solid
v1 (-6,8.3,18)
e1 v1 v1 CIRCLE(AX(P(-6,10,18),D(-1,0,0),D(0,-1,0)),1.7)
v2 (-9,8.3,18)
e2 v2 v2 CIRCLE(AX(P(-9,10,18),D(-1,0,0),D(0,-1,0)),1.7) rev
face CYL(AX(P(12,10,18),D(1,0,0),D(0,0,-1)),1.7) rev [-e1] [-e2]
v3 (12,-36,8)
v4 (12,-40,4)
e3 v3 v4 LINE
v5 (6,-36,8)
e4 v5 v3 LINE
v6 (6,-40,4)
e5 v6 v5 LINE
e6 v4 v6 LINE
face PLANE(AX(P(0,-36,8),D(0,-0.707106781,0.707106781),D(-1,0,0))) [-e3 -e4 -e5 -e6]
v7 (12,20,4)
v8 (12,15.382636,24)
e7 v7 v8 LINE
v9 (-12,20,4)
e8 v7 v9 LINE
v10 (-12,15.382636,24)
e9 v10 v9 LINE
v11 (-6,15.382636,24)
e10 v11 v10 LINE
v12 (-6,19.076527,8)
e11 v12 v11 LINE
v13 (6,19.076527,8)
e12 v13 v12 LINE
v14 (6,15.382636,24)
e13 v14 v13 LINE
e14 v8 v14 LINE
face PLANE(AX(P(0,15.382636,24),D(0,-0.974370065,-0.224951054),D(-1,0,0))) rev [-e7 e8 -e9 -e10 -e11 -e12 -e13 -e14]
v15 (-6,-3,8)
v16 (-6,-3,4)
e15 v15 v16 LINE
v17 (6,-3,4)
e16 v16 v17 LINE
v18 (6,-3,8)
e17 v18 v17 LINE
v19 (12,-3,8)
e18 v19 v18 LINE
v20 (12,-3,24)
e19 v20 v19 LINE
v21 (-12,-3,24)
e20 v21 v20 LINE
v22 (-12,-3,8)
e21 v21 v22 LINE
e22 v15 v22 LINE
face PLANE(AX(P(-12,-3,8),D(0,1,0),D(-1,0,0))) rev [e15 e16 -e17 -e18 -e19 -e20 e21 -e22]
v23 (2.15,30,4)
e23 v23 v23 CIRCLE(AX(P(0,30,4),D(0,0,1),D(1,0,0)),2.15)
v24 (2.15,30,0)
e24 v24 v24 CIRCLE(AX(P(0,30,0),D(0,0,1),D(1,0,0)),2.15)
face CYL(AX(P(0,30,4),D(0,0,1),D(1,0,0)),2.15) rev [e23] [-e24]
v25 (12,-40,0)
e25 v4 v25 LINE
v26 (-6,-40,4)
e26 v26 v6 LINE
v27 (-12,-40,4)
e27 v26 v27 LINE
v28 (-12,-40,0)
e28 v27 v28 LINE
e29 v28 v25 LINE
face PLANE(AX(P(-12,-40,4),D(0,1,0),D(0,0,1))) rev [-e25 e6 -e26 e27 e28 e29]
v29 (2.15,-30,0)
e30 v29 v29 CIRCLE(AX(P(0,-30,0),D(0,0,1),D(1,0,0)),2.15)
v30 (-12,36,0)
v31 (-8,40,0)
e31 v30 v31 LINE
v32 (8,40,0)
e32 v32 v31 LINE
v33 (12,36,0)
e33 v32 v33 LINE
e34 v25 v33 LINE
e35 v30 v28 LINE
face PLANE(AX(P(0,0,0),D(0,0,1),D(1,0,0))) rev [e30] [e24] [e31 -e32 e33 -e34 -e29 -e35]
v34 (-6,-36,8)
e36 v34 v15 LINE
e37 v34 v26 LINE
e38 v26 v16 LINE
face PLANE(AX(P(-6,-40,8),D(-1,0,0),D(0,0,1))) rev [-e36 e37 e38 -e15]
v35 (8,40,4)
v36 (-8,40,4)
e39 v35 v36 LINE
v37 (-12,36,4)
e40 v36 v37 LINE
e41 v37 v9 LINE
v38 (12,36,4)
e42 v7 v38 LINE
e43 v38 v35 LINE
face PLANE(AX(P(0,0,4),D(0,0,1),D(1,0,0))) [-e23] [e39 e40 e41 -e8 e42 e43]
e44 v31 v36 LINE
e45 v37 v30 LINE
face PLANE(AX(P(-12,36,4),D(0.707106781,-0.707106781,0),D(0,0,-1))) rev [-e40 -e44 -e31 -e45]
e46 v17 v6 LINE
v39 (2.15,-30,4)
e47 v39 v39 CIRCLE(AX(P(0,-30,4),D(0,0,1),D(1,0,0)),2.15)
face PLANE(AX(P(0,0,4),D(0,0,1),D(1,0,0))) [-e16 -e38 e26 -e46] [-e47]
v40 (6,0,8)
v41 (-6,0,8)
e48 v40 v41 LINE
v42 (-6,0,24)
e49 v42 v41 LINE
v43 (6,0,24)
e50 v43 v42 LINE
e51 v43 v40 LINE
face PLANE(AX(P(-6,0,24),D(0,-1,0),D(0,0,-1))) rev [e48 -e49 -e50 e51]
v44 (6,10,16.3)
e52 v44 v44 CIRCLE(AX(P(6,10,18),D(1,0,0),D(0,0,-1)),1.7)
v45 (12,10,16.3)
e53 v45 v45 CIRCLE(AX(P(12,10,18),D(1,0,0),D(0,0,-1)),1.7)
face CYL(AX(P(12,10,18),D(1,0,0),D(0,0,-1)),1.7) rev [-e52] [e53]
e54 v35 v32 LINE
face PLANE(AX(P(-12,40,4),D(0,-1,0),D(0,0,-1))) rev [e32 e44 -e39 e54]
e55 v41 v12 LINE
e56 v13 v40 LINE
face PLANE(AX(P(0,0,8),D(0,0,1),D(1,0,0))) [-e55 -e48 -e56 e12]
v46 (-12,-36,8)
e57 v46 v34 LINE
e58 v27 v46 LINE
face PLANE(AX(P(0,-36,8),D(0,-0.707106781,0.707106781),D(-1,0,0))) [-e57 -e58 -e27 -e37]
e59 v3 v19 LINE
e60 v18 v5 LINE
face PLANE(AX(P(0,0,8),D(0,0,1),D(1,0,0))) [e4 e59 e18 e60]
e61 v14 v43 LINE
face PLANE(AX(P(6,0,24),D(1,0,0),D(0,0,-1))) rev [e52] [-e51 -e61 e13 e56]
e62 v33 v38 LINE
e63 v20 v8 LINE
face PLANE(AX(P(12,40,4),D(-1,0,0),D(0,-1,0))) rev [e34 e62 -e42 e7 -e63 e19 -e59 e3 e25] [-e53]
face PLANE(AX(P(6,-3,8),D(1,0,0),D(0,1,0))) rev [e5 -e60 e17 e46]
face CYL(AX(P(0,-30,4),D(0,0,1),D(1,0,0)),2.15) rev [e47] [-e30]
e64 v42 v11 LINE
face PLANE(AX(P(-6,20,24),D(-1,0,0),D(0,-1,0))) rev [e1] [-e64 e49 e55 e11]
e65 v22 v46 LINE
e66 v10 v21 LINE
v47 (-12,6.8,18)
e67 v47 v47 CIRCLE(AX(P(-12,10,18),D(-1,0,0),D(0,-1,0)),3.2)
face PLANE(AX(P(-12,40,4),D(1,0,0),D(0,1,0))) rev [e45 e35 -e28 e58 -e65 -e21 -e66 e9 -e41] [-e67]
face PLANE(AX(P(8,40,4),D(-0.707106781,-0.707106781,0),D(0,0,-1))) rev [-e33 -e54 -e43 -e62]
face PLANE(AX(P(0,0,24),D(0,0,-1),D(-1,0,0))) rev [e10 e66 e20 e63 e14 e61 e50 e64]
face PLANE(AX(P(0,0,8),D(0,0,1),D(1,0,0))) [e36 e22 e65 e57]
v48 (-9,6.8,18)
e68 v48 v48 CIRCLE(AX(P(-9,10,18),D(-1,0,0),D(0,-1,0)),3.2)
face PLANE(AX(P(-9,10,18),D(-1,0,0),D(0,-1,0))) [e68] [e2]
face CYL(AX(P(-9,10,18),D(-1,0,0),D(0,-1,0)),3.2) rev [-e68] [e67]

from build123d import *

# Parameters (mm, degrees)
ESQUISSE1_W             = 24
ESQUISSE1_H             = 80
BOSS_EXTRU_1_DEPTH      = 4
ESQUISSE2_W             = 24
ESQUISSE2_H             = 23
BOSS_EXTRU_2_DEPTH      = 4
BOSS_EXTRU_3_DEPTH      = 16
ESQUISSE4_W             = 6
ESQUISSE4_H             = 37
BOSS_EXTRU_4_DEPTH      = 4
CHANFREIN1_SIZE         = 4
CHANFREIN2_SIZE2        = 4.617363823
CHANFREIN2_SIZE         = 20
D_GAGEMENT_M31_D        = 3.4
D_GAGEMENT_M42_D        = 4.3
ESQUISSE11_R            = 3.2
ENL_V_MAT_EXTRU_1_DEPTH = 3


with BuildPart() as part:
    # Esquisse1 → Boss.-Extru.1 (new body)
    with BuildSketch(Plane.XY):
        Rectangle(ESQUISSE1_W, ESQUISSE1_H)
    extrude(amount=BOSS_EXTRU_1_DEPTH)

    # Esquisse2 → Boss.-Extru.2 (add)
    with BuildSketch(Plane.XY.offset(4)):
        with Locations((0, 8.5)):
            Rectangle(ESQUISSE2_W, ESQUISSE2_H)
    extrude(amount=BOSS_EXTRU_2_DEPTH)

    # Esquisse3 → Boss.-Extru.3 (add)
    with BuildSketch(Plane.XY.offset(8)):
        Polygon((-6, 20), (-6, 0), (6, 0), (6, 20), (12, 20), (12, -3), (-12, -3), (-12, 20), align=None)
    extrude(amount=BOSS_EXTRU_3_DEPTH)

    # Esquisse4 → Boss.-Extru.4 (add)
    with BuildSketch(Plane.XY.offset(4)):
        with Locations((-9, -21.5)):
            Rectangle(ESQUISSE4_W, ESQUISSE4_H)
        with Locations((9, -21.5)):
            Rectangle(ESQUISSE4_W, ESQUISSE4_H)
    extrude(amount=BOSS_EXTRU_4_DEPTH)

    # Chanfrein1
    chanfrein1_edges = [part.edges().sort_by_distance(p)[0] for p in [
        (-9, -40, 8),
        (9, -40, 8),
        (12, 40, 2),
        (-12, 40, 2),
    ]]
    chamfer(chanfrein1_edges, length=CHANFREIN1_SIZE)

    # Chanfrein2
    chanfrein2_edges = [part.edges().sort_by_distance(p)[0] for p in [
        (-9, 20, 24),
    ]]
    chanfrein2_side = [part.faces().sort_by_distance(p)[0] for p in [
        (-9, 20, 23.907652724),
    ]]
    chamfer(chanfrein2_edges, length=CHANFREIN2_SIZE - 0.0001, length2=CHANFREIN2_SIZE2 - 0.0001, reference=chanfrein2_side[0])  # a hair under: the kernel refuses the full size

    # Dégagement M31 (through all)
    with Locations(Plane(origin=(12, 0, 0), x_dir=(0, 0, -1), z_dir=(1, 0, 0))):
        with Locations((-18, 10)):
            Hole(D_GAGEMENT_M31_D / 2)

    # Dégagement M42 (through all)
    with Locations(Plane.XY.offset(4)):
        with Locations((0, 30), (0, -30)):
            Hole(D_GAGEMENT_M42_D / 2)

    # Esquisse11 → Enlèv. mat.-Extru.1 (cut)
    with BuildSketch(Plane.ZY.offset(12)):
        with Locations(Location((18, 10, 0), (0, 0, 270))):
            Circle(ESQUISSE11_R)
    extrude(amount=-ENL_V_MAT_EXTRU_1_DEPTH, mode=Mode.SUBTRACT)


solid = part.part
